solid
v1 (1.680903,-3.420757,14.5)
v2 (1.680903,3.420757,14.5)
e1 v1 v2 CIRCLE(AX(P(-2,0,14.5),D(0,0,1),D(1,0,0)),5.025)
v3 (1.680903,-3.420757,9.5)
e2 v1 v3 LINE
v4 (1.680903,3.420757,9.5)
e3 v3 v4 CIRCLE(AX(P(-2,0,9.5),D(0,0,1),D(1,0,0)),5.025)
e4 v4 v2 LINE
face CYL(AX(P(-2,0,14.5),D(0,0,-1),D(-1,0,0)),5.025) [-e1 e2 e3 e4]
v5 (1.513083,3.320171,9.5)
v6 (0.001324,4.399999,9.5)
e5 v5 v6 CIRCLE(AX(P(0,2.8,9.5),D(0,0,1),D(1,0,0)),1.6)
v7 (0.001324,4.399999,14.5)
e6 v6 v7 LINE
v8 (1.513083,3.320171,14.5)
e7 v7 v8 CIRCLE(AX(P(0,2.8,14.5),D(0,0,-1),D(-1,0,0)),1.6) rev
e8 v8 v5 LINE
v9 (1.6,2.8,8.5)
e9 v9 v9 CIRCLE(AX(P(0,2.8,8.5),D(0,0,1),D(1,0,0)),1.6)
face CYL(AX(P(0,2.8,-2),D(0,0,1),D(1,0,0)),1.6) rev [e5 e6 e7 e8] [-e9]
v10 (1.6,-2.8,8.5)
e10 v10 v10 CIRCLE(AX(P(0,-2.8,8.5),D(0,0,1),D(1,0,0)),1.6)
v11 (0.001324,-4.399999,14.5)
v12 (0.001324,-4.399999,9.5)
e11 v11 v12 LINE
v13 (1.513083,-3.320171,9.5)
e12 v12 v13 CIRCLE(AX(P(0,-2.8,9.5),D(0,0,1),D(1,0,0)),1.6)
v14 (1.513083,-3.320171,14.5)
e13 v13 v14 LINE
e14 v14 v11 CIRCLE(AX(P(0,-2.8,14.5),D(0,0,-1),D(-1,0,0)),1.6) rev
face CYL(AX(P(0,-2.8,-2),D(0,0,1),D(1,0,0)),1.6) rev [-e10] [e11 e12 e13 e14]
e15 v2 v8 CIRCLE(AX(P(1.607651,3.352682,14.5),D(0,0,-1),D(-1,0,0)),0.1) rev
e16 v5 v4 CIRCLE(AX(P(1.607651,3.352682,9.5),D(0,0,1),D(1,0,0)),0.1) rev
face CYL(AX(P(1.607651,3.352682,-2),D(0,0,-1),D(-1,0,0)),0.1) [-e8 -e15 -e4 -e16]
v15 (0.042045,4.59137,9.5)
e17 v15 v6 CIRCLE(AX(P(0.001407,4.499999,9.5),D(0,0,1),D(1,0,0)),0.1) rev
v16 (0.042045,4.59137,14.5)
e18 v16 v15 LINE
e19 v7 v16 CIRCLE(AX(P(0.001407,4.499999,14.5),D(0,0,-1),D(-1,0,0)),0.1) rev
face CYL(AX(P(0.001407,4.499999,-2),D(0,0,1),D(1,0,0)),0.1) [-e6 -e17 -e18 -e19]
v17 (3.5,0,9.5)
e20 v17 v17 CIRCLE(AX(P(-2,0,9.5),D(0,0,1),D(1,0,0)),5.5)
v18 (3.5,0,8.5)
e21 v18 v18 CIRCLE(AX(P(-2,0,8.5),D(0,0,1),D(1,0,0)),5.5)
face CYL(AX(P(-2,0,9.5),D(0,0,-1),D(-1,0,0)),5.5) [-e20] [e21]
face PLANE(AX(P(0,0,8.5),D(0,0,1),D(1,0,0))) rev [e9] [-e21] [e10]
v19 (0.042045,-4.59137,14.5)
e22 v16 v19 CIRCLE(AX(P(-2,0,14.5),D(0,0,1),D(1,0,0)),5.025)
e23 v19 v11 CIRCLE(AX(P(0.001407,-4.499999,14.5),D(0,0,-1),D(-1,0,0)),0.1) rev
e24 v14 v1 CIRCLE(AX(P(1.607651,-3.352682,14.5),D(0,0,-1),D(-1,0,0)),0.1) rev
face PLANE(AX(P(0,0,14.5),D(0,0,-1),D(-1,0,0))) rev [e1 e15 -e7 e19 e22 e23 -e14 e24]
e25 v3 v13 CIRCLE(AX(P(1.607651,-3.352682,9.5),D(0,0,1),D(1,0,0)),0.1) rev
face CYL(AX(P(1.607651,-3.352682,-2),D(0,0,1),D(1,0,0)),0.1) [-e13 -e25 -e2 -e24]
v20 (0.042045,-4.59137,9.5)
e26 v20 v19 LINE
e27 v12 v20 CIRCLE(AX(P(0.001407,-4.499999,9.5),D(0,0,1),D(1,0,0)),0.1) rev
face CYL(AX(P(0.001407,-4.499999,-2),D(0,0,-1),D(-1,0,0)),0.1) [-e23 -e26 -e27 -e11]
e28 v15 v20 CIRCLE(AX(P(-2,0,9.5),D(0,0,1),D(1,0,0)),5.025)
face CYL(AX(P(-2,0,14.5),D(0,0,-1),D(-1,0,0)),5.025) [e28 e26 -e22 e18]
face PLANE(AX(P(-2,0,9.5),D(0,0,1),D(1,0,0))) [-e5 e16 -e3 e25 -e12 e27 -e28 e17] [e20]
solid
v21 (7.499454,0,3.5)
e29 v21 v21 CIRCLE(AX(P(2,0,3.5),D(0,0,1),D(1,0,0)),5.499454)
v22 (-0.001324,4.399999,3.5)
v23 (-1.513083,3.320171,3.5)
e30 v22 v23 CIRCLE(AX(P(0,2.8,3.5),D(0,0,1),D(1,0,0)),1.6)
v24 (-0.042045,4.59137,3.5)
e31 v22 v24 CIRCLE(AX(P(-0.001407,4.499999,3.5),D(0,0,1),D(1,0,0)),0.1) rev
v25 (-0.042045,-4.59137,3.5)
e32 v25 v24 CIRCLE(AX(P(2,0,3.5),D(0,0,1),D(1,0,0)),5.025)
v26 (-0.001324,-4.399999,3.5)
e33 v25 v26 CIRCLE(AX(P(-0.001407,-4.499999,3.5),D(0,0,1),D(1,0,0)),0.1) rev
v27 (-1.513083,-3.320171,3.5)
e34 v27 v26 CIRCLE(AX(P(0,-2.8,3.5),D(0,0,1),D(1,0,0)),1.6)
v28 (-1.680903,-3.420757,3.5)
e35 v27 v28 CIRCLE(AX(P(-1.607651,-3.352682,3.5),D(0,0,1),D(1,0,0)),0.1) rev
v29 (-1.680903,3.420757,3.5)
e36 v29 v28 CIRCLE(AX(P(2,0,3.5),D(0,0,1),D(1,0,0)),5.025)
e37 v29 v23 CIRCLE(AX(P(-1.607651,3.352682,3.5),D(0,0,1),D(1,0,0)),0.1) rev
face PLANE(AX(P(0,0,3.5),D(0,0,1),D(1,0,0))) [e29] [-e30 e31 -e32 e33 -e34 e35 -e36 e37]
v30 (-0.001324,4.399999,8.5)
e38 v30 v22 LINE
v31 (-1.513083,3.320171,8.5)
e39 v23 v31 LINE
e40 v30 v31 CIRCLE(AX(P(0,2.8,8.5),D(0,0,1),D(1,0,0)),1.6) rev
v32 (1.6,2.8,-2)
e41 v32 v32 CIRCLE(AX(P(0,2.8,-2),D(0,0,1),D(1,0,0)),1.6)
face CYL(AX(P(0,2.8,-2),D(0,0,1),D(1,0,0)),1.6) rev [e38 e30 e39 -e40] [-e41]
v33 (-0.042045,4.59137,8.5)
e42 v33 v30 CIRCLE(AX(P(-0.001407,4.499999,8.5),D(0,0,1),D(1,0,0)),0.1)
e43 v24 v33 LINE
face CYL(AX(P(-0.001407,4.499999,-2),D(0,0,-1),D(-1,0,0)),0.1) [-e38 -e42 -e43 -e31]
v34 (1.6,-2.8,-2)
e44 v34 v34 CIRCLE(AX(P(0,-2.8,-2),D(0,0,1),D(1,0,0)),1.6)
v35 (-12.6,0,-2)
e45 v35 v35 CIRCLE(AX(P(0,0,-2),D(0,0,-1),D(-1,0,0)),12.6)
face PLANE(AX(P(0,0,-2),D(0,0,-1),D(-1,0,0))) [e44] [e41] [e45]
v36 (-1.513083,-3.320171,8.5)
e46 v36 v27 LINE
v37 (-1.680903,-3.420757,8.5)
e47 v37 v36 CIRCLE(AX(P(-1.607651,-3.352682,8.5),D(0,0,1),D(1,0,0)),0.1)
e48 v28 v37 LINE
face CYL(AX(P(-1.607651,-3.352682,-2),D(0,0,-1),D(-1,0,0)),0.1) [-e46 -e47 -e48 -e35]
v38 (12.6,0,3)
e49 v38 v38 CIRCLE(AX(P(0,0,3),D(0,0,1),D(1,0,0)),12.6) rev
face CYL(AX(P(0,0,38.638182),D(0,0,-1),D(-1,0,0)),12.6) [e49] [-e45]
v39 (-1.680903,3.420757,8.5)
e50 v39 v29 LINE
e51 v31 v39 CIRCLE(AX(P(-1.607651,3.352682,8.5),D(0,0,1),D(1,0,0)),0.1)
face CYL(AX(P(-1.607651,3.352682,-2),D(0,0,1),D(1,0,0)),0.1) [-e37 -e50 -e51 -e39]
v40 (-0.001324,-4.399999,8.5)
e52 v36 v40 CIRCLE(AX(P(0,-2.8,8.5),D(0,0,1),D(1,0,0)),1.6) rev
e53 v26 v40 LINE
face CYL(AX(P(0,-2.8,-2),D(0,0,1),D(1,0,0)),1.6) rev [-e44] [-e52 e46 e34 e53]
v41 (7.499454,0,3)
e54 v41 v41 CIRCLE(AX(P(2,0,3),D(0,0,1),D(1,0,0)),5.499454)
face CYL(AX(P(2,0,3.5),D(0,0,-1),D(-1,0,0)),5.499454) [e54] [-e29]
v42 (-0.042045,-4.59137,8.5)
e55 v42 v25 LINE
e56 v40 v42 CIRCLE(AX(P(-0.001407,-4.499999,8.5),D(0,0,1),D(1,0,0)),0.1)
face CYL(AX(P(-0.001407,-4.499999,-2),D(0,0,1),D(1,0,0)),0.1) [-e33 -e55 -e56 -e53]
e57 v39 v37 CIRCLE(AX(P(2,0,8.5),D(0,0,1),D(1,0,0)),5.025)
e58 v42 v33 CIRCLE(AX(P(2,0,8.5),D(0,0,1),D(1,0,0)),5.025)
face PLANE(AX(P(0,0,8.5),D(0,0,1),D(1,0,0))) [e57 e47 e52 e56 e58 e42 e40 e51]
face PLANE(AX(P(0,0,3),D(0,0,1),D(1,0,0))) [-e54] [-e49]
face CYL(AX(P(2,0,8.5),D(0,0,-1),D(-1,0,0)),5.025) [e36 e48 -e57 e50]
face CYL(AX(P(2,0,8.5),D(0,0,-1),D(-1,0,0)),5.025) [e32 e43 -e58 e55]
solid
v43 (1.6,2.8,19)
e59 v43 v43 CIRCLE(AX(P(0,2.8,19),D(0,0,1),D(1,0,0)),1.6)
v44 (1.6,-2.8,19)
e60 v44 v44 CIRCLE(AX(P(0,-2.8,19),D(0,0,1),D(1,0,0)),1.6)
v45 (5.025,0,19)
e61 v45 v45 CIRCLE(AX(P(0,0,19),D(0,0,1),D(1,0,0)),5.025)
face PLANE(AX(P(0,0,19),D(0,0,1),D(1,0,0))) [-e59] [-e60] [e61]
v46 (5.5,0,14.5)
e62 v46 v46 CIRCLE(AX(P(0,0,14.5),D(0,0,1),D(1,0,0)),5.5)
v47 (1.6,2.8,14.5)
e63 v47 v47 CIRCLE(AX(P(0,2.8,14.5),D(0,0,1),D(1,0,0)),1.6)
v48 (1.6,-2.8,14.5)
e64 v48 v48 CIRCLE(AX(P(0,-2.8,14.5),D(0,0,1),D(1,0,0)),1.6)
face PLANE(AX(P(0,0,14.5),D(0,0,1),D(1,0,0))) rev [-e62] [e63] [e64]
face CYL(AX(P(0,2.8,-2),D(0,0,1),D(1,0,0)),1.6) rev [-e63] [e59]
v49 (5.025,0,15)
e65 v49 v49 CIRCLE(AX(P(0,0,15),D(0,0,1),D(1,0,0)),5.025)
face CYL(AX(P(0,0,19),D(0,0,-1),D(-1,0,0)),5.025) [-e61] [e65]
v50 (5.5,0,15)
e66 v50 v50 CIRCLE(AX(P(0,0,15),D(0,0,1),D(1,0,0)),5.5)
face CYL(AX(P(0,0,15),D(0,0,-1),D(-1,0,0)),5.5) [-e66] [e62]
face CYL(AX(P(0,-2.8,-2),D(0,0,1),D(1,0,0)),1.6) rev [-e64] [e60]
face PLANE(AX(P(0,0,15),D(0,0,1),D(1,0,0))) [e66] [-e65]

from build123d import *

# Parameters (mm, degrees)
SKETCH1_R            = 12.6
BOSS_EXTRUDE1_DEPTH  = 5
SKETCH2_R            = 5.499454457575955
SKETCH2_R_2          = 5.0249999999999995
BOSS_EXTRUDE2_DEPTH  = 0.5
SKETCH2_3_R          = 5.0249999999999995
BOSS_EXTRUDE3_DEPTH  = 5.5
BOSS_EXTRUDE4_START  = 5.5
SKETCH3_R            = 5.5
SKETCH3_R_2          = 5.0249999999999995
BOSS_EXTRUDE4_DEPTH  = 1
BOSS_EXTRUDE5_START  = 5.5
SKETCH3_3_R          = 5.0249999999999995
BOSS_EXTRUDE5_DEPTH  = 6
BOSS_EXTRUDE6_START  = 11.5
SKETCH4_R            = 5.5
SKETCH4_R_2          = 5.0249999999999995
BOSS_EXTRUDE6_DEPTH  = 0.5
BOSS_EXTRUDE7_START  = 11.5
SKETCH4_7_R          = 5.0249999999999995
BOSS_EXTRUDE7_DEPTH  = 4.5
SKETCH5_R            = 1.6000000000000003
CUT_EXTRUDE1_DEPTH   = 28.541241802068402
SPLIT1_START         = 8.5
SPLIT1_OUTLINE_R     = 1.6
SPLIT1_DEPTH         = 10.5
SPLIT1_2_DEPTH       = 6
SPLIT1_3_OUTLINE_R   = 5.5
SPLIT1_3_DEPTH       = 1
SPLIT1_START_2       = 14.5
SPLIT1_4_OUTLINE_R   = 5.025
SPLIT1_4_OUTLINE_R_2 = 1.6
SPLIT1_4_DEPTH       = 4.5
SPLIT1_5_OUTLINE_R   = 5.5
SPLIT1_5_OUTLINE_R_2 = 5.025
SPLIT1_5_DEPTH       = 0.5
FILLET1_R            = 0.1
FILLET2_R            = 0.1


# Read off the part's stored shape, not the designer's step: Split1
with BuildPart() as part:
    # Sketch1 → Boss-Extrude1 (new body)
    with BuildSketch(Plane(origin=(0, 0, -2), x_dir=(-1, 0, 0), z_dir=(0, 0, -1))):
        Circle(SKETCH1_R)
    extrude(amount=-BOSS_EXTRUDE1_DEPTH)

    # Sketch2 → Boss-Extrude2 (add)
    with BuildSketch(Plane.XY.offset(3)):
        with Locations((2, 0)):
            Circle(SKETCH2_R)
        with Locations((2, 0)):
            Circle(SKETCH2_R_2, mode=Mode.SUBTRACT)
    extrude(amount=BOSS_EXTRUDE2_DEPTH)

    # Sketch2<3> → Boss-Extrude3 (add)
    with BuildSketch(Plane.XY.offset(3)):
        with Locations((2, 0)):
            Circle(SKETCH2_3_R)
    extrude(amount=BOSS_EXTRUDE3_DEPTH)



with BuildPart() as body_2:
    # Sketch3 → Boss-Extrude4 (new body)
    with BuildSketch(Plane.XY.offset(3).offset(BOSS_EXTRUDE4_START)):
        with Locations((-2, -2.4e-16)):
            Circle(SKETCH3_R)
        with Locations((-2, -2.4e-16)):
            Circle(SKETCH3_R_2, mode=Mode.SUBTRACT)
    extrude(amount=BOSS_EXTRUDE4_DEPTH)


with BuildPart() as part_1:
    add(part.part)

    add(body_2.part)  # Boss-Extrude5 merges body 2
    # Sketch3<3> → Boss-Extrude5 (add)
    with BuildSketch(Plane.XY.offset(3).offset(BOSS_EXTRUDE5_START)):
        with Locations((-2, -2.4e-16)):
            Circle(SKETCH3_3_R)
    extrude(amount=BOSS_EXTRUDE5_DEPTH)

    # Sketch4 → Boss-Extrude6 (add)
    with BuildSketch(Plane.XY.offset(3).offset(BOSS_EXTRUDE6_START)):
        with Locations(Location((0, 0, 0), (0, 0, 114.145956113))):
            Circle(SKETCH4_R)
        with Locations(Location((0, 0, 0), (0, 0, 101.478778724))):
            Circle(SKETCH4_R_2, mode=Mode.SUBTRACT)
    extrude(amount=BOSS_EXTRUDE6_DEPTH)

    # Sketch4<7> → Boss-Extrude7 (add)
    with BuildSketch(Plane.XY.offset(3).offset(BOSS_EXTRUDE7_START)):
        Circle(SKETCH4_7_R)
    extrude(amount=BOSS_EXTRUDE7_DEPTH)

    # Sketch5 → Cut-Extrude1 (cut, through all)
    with BuildSketch(Plane.XY.offset(19)):
        with Locations((2e-17, 2.8)):
            Circle(SKETCH5_R)
        with Locations((7.1e-16, -2.8)):
            Circle(SKETCH5_R)
    extrude(amount=-CUT_EXTRUDE1_DEPTH, mode=Mode.SUBTRACT)

    # Split1 outline → Split1 (cut)
    with BuildSketch(Plane.XY.offset(SPLIT1_START)):
        with BuildLine():
            ThreePointArc((-1, 5.408326913), (-7.5, 0), (-1, -5.408326913))
            ThreePointArc((-1, -5.408326913), (5.5, 0), (-1, 5.408326913))
        make_face()
        with Locations((0, 2.8)):
            Circle(SPLIT1_OUTLINE_R, mode=Mode.SUBTRACT)
        with Locations((0, -2.8)):
            Circle(SPLIT1_OUTLINE_R, mode=Mode.SUBTRACT)
    extrude(amount=SPLIT1_DEPTH, mode=Mode.SUBTRACT)

    # Fillet2
    fillet2_edges = [part_1.edges().sort_by_distance(p)[0] for p in [
        (-0.6950501563684846, -4.241147209736796, 6),
        (-1.1378256882261084, -3.9248789726956352, 6),
        (-1.1378256882260929, 3.924878972695648, 6),
        (-0.6950501563685023, 4.241147209736784, 6),
    ]]
    fillet(fillet2_edges, radius=FILLET2_R)


with BuildPart() as body_2_2:
    # Split1 2 outline → Split1 2 (new body)
    with BuildSketch(Plane.XY.offset(SPLIT1_START)):
        with BuildLine():
            ThreePointArc((1.137825688, -3.924878973), (3.025, 0), (1.137825688, 3.924878973))
            ThreePointArc((1.137825688, 3.924878973), (-0.92998111, 1.498026446), (0.695050156, 4.24114721))
            ThreePointArc((0.695050156, 4.24114721), (-7.025, 0), (0.695050156, -4.24114721))
            ThreePointArc((0.695050156, -4.24114721), (-0.92998111, -1.498026446), (1.137825688, -3.924878973))
        make_face()
    extrude(amount=SPLIT1_2_DEPTH)

    # Split1 3 outline → Split1 3 (add)
    with BuildSketch(Plane.XY.offset(SPLIT1_START)):
        with Locations((-2, 0)):
            Circle(SPLIT1_3_OUTLINE_R)
        with BuildLine():
            ThreePointArc((0.695050156, 4.24114721), (0.92998111, 4.101973554), (1.137825688, 3.924878973))
            ThreePointArc((1.137825688, 3.924878973), (3.025, 0), (1.137825688, -3.924878973))
            ThreePointArc((1.137825688, -3.924878973), (0.92998111, -4.101973554), (0.695050156, -4.24114721))
            ThreePointArc((0.695050156, -4.24114721), (-7.025, 0), (0.695050156, 4.24114721))
        make_face(mode=Mode.SUBTRACT)
    extrude(amount=SPLIT1_3_DEPTH)

    # Fillet1
    # the kernel refuses this fillet: 0.1 mm, written as the material it takes off along each edge
    with BuildSketch(Plane(origin=(1.1378256880000006, -3.924878973, 9.5), x_dir=(0.5272838464707954, 0.8496892050926401, 0), z_dir=(0, 0, 1))) as fillet1_piece_1:
        with BuildLine():
            CenterArc((0.7339208558356513, -0.09749554475196075), FILLET1_R, 102.8500510005881, 156.06997269077794)
            ThreePointArc((0.7147029545095785, -0.19563153340353207), (0.3537405486988825, -0.1110076139593656), (0, 0))
            ThreePointArc((0, 0), (0.3558404149511242, -0.0400712839705069), (0.7116808299022489, -4e-17))
        make_face()
    extrude(amount=6.85248483469929, mode=Mode.SUBTRACT)
    with BuildSketch(Plane(origin=(0.6950501559999995, -4.241147210000001, 9.5), x_dir=(-0.9747710361649122, -0.22320713934366773, 0), z_dir=(0, 0, 1))) as fillet1_piece_2:
        with BuildLine():
            CenterArc((0.7339208553218103, 0.09749554475551281), FILLET1_R, 101.07997632228573, 156.06997268627677)
            ThreePointArc((0.714702953972355, 0.19563153340250483), (0.35374054843265157, 0.1110076139403167), (0, 0))
            ThreePointArc((0, 0), (0.35584041470198946, 0.04007128391367626), (0.7116808294039787, 0))
        make_face()
    extrude(amount=6.8524848334032065, mode=Mode.SUBTRACT)
    with BuildSketch(Plane(origin=(0.6950501560000002, 4.24114721, 9.5), x_dir=(-0.8812560463152725, 0.4726391655721877, 0), z_dir=(0, 0, 1))) as fillet1_piece_3:
        with BuildLine():
            CenterArc((0.7336208593975166, 0.09972781848774585), FILLET1_R, 118.15832442623193, 156.06997268627686)
            ThreePointArc((0.6864298993019216, 0.18789251258496353), (0.353794262604145, 0.05529672936227222), (0, 0))
            ThreePointArc((0, 0), (0.3704969666806427, -0.01367712099081776), (0.7409939333612872, 0))
        make_face()
    extrude(amount=6.852484833403217, mode=Mode.SUBTRACT)
    with BuildSketch(Plane(origin=(1.1378256880000008, 3.924878973, 9.5), x_dir=(0.7329038743989365, -0.6803322062720741, 0), z_dir=(0, 0, 1))) as fillet1_piece_4:
        with BuildLine():
            CenterArc((0.7336208599111411, -0.09972781848739057), FILLET1_R, 85.77170288473079, 156.06997269077783)
            ThreePointArc((0.6864298998182243, -0.1878925125860417), (0.3537942628699536, -0.05529672930598591), (0, 0))
            ThreePointArc((0, 0), (0.3704969669398583, 0.013677121009324), (0.7409939338797163, 3e-17))
        make_face()
    extrude(amount=6.85248483469929, mode=Mode.SUBTRACT)


with BuildPart() as body_3:
    # Split1 4 outline → Split1 4 (new body)
    with BuildSketch(Plane.XY.offset(SPLIT1_START_2)):
        Circle(SPLIT1_4_OUTLINE_R)
        with Locations((0, -2.8)):
            Circle(SPLIT1_4_OUTLINE_R_2, mode=Mode.SUBTRACT)
        with Locations((0, 2.8)):
            Circle(SPLIT1_4_OUTLINE_R_2, mode=Mode.SUBTRACT)
    extrude(amount=SPLIT1_4_DEPTH)

    # Split1 5 outline → Split1 5 (add)
    with BuildSketch(Plane.XY.offset(SPLIT1_START_2)):
        Circle(SPLIT1_5_OUTLINE_R)
        Circle(SPLIT1_5_OUTLINE_R_2, mode=Mode.SUBTRACT)
    extrude(amount=SPLIT1_5_DEPTH)


solid = Compound([part_1.part, body_2_2.part, body_3.part])
